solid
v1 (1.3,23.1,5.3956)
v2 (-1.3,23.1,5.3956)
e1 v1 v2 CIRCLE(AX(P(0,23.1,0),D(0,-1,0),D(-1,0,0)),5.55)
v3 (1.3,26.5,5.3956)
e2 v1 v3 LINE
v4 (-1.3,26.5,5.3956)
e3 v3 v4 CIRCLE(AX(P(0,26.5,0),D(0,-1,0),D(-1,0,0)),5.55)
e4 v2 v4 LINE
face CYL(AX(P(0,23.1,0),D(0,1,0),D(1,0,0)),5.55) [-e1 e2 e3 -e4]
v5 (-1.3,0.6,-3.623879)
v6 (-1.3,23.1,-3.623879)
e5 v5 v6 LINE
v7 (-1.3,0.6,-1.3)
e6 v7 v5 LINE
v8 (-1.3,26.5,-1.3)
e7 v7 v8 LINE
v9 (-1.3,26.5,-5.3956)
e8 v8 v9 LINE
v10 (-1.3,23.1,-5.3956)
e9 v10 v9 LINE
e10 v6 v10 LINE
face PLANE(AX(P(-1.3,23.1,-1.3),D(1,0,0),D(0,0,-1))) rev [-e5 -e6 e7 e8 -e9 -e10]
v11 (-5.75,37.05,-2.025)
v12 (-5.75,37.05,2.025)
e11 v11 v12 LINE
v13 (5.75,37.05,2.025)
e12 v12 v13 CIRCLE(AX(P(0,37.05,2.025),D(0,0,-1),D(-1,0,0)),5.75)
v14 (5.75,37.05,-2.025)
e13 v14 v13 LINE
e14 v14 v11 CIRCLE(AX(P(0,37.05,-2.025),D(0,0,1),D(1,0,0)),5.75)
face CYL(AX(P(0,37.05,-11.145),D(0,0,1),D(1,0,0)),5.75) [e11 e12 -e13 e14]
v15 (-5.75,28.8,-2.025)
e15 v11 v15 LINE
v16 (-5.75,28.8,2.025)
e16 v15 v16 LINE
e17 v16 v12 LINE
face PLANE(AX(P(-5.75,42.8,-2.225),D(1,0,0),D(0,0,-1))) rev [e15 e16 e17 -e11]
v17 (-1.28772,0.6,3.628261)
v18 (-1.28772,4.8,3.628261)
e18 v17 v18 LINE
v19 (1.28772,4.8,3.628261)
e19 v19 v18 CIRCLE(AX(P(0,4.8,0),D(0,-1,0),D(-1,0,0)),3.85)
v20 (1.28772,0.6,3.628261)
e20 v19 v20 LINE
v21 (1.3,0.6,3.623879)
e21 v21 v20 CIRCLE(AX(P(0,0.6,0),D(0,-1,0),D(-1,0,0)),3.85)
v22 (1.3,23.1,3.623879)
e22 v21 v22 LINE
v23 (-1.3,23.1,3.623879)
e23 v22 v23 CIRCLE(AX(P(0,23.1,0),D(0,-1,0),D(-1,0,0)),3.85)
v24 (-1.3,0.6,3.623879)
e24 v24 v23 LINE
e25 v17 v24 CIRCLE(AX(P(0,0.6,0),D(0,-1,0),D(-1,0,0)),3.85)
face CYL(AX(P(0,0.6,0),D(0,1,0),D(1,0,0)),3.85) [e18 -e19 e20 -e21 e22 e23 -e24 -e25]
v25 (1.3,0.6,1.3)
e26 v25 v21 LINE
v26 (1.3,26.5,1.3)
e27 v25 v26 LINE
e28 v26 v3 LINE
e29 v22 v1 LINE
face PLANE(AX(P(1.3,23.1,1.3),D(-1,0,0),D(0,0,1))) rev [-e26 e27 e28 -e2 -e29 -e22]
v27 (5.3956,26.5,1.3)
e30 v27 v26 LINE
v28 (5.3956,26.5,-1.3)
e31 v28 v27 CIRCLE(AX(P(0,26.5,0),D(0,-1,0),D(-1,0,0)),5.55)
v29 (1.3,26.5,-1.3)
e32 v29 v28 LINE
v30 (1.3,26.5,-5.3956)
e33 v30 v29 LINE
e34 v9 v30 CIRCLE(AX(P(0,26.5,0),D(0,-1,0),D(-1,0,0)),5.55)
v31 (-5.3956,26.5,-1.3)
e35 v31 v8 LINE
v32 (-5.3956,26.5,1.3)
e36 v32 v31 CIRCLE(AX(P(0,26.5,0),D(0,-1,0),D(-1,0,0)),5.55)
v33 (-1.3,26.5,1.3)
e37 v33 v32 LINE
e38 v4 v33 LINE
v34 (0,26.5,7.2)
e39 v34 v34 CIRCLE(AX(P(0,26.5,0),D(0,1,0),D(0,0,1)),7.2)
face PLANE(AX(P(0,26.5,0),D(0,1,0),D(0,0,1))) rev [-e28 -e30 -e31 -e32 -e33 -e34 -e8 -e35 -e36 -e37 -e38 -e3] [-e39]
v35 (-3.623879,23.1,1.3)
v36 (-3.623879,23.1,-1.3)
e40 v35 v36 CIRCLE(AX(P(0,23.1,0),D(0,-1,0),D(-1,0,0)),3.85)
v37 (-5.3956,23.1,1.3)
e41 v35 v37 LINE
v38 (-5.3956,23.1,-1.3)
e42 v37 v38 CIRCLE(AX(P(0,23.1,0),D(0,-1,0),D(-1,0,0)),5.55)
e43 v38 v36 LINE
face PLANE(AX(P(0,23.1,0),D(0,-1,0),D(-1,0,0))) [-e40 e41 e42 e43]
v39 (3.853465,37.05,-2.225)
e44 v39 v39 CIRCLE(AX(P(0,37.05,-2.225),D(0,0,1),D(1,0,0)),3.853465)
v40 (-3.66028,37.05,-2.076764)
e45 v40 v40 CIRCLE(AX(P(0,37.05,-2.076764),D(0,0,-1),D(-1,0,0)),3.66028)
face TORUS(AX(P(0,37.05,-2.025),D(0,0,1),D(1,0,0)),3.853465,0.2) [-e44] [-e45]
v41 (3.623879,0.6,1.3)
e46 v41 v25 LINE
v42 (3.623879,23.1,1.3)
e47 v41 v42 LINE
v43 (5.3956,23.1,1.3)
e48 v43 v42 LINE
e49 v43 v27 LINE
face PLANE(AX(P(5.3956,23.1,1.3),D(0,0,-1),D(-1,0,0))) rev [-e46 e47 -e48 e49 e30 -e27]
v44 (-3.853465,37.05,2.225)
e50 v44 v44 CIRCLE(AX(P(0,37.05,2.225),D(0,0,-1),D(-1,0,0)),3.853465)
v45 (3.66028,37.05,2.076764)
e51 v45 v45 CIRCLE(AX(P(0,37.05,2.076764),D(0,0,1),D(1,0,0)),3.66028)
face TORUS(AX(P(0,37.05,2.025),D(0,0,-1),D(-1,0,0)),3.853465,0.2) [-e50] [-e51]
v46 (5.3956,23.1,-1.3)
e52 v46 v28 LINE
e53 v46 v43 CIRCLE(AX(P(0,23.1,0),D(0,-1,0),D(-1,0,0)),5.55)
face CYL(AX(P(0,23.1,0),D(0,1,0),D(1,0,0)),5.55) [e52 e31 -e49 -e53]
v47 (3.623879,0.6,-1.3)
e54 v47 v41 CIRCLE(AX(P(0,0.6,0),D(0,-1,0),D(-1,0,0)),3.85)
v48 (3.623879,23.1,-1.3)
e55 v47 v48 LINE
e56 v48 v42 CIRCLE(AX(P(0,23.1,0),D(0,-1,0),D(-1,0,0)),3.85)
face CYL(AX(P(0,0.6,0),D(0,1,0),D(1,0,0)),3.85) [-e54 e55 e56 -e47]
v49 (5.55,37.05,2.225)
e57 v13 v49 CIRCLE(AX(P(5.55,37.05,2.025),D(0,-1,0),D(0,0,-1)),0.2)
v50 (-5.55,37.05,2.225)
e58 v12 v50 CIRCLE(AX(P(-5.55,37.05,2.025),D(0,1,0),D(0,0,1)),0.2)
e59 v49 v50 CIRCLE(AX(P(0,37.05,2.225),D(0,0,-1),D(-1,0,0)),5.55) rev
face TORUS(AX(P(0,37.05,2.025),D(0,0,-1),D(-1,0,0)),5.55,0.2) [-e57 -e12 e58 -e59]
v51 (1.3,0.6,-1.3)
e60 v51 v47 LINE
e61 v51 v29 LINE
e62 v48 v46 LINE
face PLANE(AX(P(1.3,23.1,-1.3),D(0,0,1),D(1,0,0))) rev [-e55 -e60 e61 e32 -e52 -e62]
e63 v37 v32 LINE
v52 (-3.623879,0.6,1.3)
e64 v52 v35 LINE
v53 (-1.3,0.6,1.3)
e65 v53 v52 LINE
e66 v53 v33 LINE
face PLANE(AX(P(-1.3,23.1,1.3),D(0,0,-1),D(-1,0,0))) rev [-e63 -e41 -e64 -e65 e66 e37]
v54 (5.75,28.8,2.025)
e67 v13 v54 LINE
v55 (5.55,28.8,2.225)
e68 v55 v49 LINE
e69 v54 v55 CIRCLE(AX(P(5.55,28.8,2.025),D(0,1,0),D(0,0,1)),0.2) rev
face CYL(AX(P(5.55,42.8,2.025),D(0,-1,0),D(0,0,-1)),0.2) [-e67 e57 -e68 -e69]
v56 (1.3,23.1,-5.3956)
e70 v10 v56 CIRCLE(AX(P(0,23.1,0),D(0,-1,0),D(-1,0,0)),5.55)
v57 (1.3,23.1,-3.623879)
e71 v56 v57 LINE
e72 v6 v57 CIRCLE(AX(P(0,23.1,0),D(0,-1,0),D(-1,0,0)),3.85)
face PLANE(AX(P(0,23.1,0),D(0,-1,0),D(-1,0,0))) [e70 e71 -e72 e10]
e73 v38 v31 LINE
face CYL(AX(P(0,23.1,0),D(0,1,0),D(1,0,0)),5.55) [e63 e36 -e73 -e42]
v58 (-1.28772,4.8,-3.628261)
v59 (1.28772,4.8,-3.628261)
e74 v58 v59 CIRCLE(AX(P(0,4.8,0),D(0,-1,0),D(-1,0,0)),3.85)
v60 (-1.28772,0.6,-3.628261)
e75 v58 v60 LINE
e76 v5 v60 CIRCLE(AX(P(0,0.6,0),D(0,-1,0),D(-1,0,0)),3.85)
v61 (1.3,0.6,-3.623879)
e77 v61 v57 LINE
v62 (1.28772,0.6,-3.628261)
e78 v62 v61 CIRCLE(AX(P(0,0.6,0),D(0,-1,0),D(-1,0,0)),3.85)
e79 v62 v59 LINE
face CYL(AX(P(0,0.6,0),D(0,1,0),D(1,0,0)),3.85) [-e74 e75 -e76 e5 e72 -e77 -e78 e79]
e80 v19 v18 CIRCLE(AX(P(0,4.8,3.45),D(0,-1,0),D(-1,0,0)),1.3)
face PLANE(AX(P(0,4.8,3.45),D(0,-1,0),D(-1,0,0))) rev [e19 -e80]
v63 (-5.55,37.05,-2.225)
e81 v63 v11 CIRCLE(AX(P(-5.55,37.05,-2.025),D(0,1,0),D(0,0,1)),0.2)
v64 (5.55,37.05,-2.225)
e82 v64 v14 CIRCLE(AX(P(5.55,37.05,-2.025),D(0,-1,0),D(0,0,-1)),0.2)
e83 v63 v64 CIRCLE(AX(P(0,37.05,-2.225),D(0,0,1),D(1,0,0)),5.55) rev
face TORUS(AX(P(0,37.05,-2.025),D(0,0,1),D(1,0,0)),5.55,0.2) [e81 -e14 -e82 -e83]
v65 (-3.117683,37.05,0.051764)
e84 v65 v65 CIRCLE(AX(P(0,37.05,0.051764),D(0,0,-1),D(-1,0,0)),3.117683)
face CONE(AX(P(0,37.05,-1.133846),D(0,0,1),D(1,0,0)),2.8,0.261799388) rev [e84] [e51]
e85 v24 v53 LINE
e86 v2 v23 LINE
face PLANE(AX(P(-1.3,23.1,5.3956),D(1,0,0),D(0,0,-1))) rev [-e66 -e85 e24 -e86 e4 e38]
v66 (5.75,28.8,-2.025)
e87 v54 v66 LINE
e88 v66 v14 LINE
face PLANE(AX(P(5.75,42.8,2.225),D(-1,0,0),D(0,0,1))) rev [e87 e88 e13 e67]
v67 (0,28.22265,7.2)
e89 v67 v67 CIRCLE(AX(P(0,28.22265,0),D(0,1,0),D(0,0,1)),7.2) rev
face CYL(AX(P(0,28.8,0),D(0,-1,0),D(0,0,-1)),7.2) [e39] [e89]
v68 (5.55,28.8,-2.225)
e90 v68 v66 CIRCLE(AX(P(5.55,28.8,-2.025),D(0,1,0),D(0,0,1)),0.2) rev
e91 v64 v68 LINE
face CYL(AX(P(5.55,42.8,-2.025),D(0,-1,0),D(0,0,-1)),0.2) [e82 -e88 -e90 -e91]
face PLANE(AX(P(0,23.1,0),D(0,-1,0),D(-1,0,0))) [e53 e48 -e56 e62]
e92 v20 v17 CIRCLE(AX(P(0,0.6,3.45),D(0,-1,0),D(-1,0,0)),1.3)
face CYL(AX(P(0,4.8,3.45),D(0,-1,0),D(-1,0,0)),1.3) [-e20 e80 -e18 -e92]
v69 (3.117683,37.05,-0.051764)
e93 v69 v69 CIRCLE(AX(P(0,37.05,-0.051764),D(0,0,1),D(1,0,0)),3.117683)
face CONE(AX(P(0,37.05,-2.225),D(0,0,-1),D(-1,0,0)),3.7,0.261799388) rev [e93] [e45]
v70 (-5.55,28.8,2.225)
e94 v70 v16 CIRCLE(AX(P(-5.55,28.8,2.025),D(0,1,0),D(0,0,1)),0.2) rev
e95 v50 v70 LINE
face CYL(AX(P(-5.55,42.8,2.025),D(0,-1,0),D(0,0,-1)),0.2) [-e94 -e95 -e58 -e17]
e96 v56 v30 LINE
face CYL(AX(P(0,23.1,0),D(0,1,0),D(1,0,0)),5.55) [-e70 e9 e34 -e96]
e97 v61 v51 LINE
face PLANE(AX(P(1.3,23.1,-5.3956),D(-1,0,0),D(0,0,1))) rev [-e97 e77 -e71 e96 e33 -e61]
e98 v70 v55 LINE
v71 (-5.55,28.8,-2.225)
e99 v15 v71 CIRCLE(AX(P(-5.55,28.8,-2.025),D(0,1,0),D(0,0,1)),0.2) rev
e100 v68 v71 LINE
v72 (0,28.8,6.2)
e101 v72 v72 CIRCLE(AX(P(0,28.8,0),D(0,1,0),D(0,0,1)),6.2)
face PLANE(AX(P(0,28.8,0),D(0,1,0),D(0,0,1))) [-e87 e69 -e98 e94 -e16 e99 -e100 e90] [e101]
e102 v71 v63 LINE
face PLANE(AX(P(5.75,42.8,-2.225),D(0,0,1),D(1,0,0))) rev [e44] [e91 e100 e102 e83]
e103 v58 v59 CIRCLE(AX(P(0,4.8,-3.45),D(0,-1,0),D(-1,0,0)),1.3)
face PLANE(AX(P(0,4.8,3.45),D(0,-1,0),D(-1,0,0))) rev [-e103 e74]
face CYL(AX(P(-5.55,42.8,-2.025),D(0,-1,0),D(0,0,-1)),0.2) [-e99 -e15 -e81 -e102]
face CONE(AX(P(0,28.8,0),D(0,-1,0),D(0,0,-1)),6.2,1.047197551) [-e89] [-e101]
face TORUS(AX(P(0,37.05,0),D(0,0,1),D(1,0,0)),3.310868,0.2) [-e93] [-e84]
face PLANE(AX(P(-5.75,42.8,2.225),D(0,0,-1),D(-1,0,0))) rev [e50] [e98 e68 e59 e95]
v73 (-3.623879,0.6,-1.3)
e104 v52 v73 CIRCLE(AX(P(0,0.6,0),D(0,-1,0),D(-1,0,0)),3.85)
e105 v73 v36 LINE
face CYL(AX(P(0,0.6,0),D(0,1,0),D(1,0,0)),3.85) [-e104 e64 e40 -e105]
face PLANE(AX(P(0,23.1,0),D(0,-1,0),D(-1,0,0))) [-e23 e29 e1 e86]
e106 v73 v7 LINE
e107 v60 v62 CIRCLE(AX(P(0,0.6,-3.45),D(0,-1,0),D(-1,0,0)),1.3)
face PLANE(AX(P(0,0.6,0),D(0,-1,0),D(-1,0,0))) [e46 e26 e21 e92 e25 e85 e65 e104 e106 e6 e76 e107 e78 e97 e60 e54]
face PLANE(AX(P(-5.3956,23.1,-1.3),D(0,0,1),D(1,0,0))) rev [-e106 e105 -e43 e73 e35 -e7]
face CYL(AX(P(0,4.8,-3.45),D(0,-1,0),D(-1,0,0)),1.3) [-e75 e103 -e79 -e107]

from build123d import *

# Parameters (mm, degrees)
CROQUIS1_R                 = 5.5
SALIENTE_EXTRUIR1_DEPTH    = 26.5
CROQUIS2_R                 = 7.2
SALIENTE_EXTRUIR2_DEPTH    = 2.3
CROQUIS3_W                 = 11.5
CROQUIS3_H                 = 4.45
SALIENTE_EXTRUIR3_DEPTH    = 14
CORTAR_EXTRUIR1_DEPTH      = 13.37
CROQUIS6_R                 = 4
CORTAR_EXTRUIR2_DEPTH      = 26.5
CROQUIS7_R                 = 2.8
CORTAR_EXTRUIR3_DEPTH      = 26.37
CHAFL_N1_SIZE              = 0.9
CHAFL_N1_SIZE2             = 3.358845727
CHAFL_N2_SIZE              = 3.358845727
CHAFL_N2_SIZE_2            = 0.9
REDONDEO1_R                = 0.2
REDONDEO2_R                = 0.2
CROQUIS11_W                = 4
CROQUIS11_H                = 22.3
CORTAR_EXTRUIR4_DEPTH      = 48.550085436
CORTAR_EXTRUIR5_DEPTH      = 8.4
REDONDEO3_R                = 0.2
CROQUIS14_W                = 14.4
CROQUIS14_H                = 26.5
CORTAR_EXTRUIR6_DEPTH      = 28.4
SALIENTE_EXTRUIR4_DEPTH    = 3.4
SALIENTE_EXTRUIR5_DEPTH    = 22.5
SALIENTE_EXTRUIR6_DEPTH    = 4.2
CHAFL_N3_SIZE              = 1
CHAFL_N3_SIZE2             = 0.577350269
S_LIDO_MOVER_COPIAR1_ANGLE = 90


with BuildPart() as part:
    # Croquis1 → Saliente-Extruir1 (new body)
    with BuildSketch(Plane(origin=(0, 0, 0), x_dir=(1, 0, 0), z_dir=(0, 1, 0))):
        with Locations(Location((0, 0, 0), (0, 0, 270))):
            Circle(CROQUIS1_R)
    extrude(amount=SALIENTE_EXTRUIR1_DEPTH)

    # Croquis2 → Saliente-Extruir2 (add)
    with BuildSketch(Plane(origin=(0, 26.5, 0), x_dir=(1, 0, 0), z_dir=(0, 1, 0))):
        with Locations(Location((0, 0, 0), (0, 0, 270))):
            Circle(CROQUIS2_R)
    extrude(amount=SALIENTE_EXTRUIR2_DEPTH)

    # Croquis3 → Saliente-Extruir3 (add)
    with BuildSketch(Plane(origin=(0, 28.8, 0), x_dir=(1, 0, 0), z_dir=(0, 1, 0))):
        Rectangle(CROQUIS3_W, CROQUIS3_H)
    extrude(amount=SALIENTE_EXTRUIR3_DEPTH)

    # Croquis4 → Cortar-Extruir1 (cut)
    with BuildSketch(Plane.XY.offset(2.225)):
        with BuildLine():
            Line((5.75, 42.8), (0, 42.8))
            ThreePointArc((0, 42.8), (4.065863992, 41.115863992), (5.75, 37.05))
            Line((5.75, 37.05), (5.75, 42.8))
        make_face()
        with BuildLine():
            Line((0, 42.8), (-5.75, 42.8))
            Line((-5.75, 42.8), (-5.75, 37.05))
            ThreePointArc((-5.75, 37.05), (-4.065863992, 41.115863992), (0, 42.8))
        make_face()
    extrude(amount=-CORTAR_EXTRUIR1_DEPTH, mode=Mode.SUBTRACT)

    # Croquis6 → Cortar-Extruir2 (cut)
    with BuildSketch(Plane.XZ):
        with Locations(Location((0, 0, 0), (0, 0, 270))):
            Circle(CROQUIS6_R)
    extrude(amount=-CORTAR_EXTRUIR2_DEPTH, mode=Mode.SUBTRACT)

    # Croquis7 → Cortar-Extruir3 (cut)
    with BuildSketch(Plane.XY.offset(2.225)):
        with Locations((0, 37.05)):
            Circle(CROQUIS7_R)
    extrude(amount=-CORTAR_EXTRUIR3_DEPTH, mode=Mode.SUBTRACT)

    # Chaflán1
    chafl_n1_edges = [part.edges().sort_by_distance(p)[0] for p in [
        (-2.8, 37.05, 2.225),
    ]]
    chafl_n1_side = [part.faces().sort_by_distance(p)[0] for p in [
        (0, 28.981176709, 2.225),
    ]]
    chamfer(chafl_n1_edges, length=CHAFL_N1_SIZE, length2=CHAFL_N1_SIZE2, reference=chafl_n1_side[0])

    # Chaflán2
    # the kernel refuses this chamfer: 3.358845727, 0.9 mm, written as the material it takes off along each edge
    with BuildSketch(Plane(origin=(0, 37.05, -2.225), x_dir=(1, 0, 0), z_dir=(0, -1, 0))) as chafl_n2_piece_1:
        Polygon((2.8, CHAFL_N2_SIZE), (2.8 + CHAFL_N2_SIZE_2, 0), (2.8, 0), align=None)
    revolve(axis=Axis((0, 37.05, -2.225), (0, 0, 1)), mode=Mode.SUBTRACT)

    # Redondeo1
    redondeo1_edges = [part.edges().sort_by_distance(p)[0] for p in [
        (-5.75, 32.925, 2.225),
        (-5.75, 32.925, -2.225),
        (0, 42.8, 2.225),
        (0, 42.8, -2.225),
        (5.75, 32.925, -2.225),
        (5.75, 32.925, 2.225),
    ]]
    fillet(redondeo1_edges, radius=REDONDEO1_R)

    # Redondeo2
    redondeo2_edges = [part.edges().sort_by_distance(p)[0] for p in [
        (-3.7, 37.05, 2.225),
        (-3.7, 37.05, -2.225),
        (-3.103813047, 37.05, 0),
    ]]
    fillet(redondeo2_edges, radius=REDONDEO2_R)

    # Croquis11 → Cortar-Extruir4 (cut, through all)
    with BuildSketch(Plane.XY.offset(12.225)):
        with Locations((0, 15.35)):
            Rectangle(CROQUIS11_W, CROQUIS11_H)
    extrude(amount=-CORTAR_EXTRUIR4_DEPTH, mode=Mode.SUBTRACT)

    # Croquis13 → Cortar-Extruir5 (cut)
    with BuildSketch(Plane.XZ):
        with BuildLine():
            Line((-2, -4.19791615), (4.520060123, 1.091584394))
            ThreePointArc((4.520060123, 1.091584394), (3.611110666, 2.929569892), (2, 4.19791615))
            Line((2, 4.19791615), (-4.520060123, -1.091584394))
            ThreePointArc((-4.520060123, -1.091584394), (-3.611110666, -2.929569892), (-2, -4.19791615))
        make_face()
    extrude(amount=-CORTAR_EXTRUIR5_DEPTH, mode=Mode.SUBTRACT)

    # Redondeo3
    redondeo3_edges = [part.edges().sort_by_distance(p)[0] for p in [
        (-2, 4.2, -4.660695766),
        (-2, 4.2, 4.293788499),
        (-2, 26.5, -4.293788499),
        (-2, 26.5, 4.293788499),
        (2, 26.5, 4.293788499),
        (2, 26.5, -4.293788499),
        (2, 4.2, -4.293788499),
        (2, 4.2, 4.660695766),
    ]]
    fillet(redondeo3_edges, radius=REDONDEO3_R)

    # Croquis14 → Cortar-Extruir6 (cut)
    with BuildSketch(Plane(origin=(15.75, 0, 0), x_dir=(0, 0, -1), z_dir=(1, 0, 0))):
        with Locations((0, 13.25)):
            Rectangle(CROQUIS14_W, CROQUIS14_H)
    extrude(amount=-CORTAR_EXTRUIR6_DEPTH, mode=Mode.SUBTRACT)

    # Chaflán3
    chafl_n3_edges = [part.edges().sort_by_distance(p)[0] for p in [
        (0, 28.8, -7.2),
    ]]
    chafl_n3_side = [part.faces().sort_by_distance(p)[0] for p in [
        (-5.953646753, 28.8, 0),
    ]]
    chamfer(chafl_n3_edges, length=CHAFL_N3_SIZE, length2=CHAFL_N3_SIZE2, reference=chafl_n3_side[0])


with BuildPart() as body_2:
    # Croquis15 → Saliente-Extruir4 (new body)
    with BuildSketch(Plane.XZ.offset(-26.5)):
        with BuildLine():
            Line((-1.3, 5.395600059), (-1.3, 1.3))
            Line((-1.3, 1.3), (-5.395600059, 1.3))
            ThreePointArc((-5.395600059, 1.3), (-5.55, 0), (-5.395600059, -1.3))
            Line((-5.395600059, -1.3), (-1.3, -1.3))
            Line((-1.3, -1.3), (-1.3, -5.395600059))
            ThreePointArc((-1.3, -5.395600059), (0, -5.55), (1.3, -5.395600059))
            Line((1.3, -5.395600059), (1.3, -1.3))
            Line((1.3, -1.3), (5.395600059, -1.3))
            ThreePointArc((5.395600059, -1.3), (5.55, 0), (5.395600059, 1.3))
            Line((5.395600059, 1.3), (1.3, 1.3))
            Line((1.3, 1.3), (1.3, 5.395600059))
            ThreePointArc((1.3, 5.395600059), (0, 5.55), (-1.3, 5.395600059))
        make_face()
    extrude(amount=SALIENTE_EXTRUIR4_DEPTH)


with BuildPart() as body_3:
    # Croquis16 → Saliente-Extruir5 (new body)
    with BuildSketch(Plane.XZ.offset(-23.1)):
        with BuildLine():
            Line((-3.623879137, 1.3), (-1.3, 1.3))
            Line((-1.3, 1.3), (-1.3, 3.623879137))
            ThreePointArc((-1.3, 3.623879137), (0, 3.85), (1.3, 3.623879137))
            Line((1.3, 3.623879137), (1.3, 1.3))
            Line((1.3, 1.3), (3.623879137, 1.3))
            ThreePointArc((3.623879137, 1.3), (3.85, 0), (3.623879137, -1.3))
            Line((3.623879137, -1.3), (1.3, -1.3))
            Line((1.3, -1.3), (1.3, -3.623879137))
            ThreePointArc((1.3, -3.623879137), (0, -3.85), (-1.3, -3.623879137))
            Line((-1.3, -3.623879137), (-1.3, -1.3))
            Line((-1.3, -1.3), (-3.623879137, -1.3))
            ThreePointArc((-3.623879137, -1.3), (-3.85, 0), (-3.623879137, 1.3))
        make_face()
    extrude(amount=SALIENTE_EXTRUIR5_DEPTH)


with BuildPart() as body_4:
    # Croquis17 → Saliente-Extruir6 (new body)
    with BuildSketch(Plane.XZ.offset(-0.6)):
        with BuildLine():
            Line((-3.45, 1.3), (3.45, 1.3))
            ThreePointArc((3.45, 1.3), (4.75, 0), (3.45, -1.3))
            Line((3.45, -1.3), (-3.45, -1.3))
            ThreePointArc((-3.45, -1.3), (-4.75, 0), (-3.45, 1.3))
        make_face()
    extrude(amount=-SALIENTE_EXTRUIR6_DEPTH)


with BuildPart() as body_3_1:
    add(body_3.part)

    # Combinar1: union body 4
    add(body_4.part)


with BuildPart() as body_2_1:
    add(body_2.part)

    # Combinar2: union body 3
    add(body_3_1.part)


with BuildPart() as body_2_2:
    # Sólido-Mover/Copiar1: moved
    add(body_2_1.part.rotate(Axis((0, 0, 0), (0, 1, 0)), S_LIDO_MOVER_COPIAR1_ANGLE))

    # Combinar3: union part
    add(part.part)


solid = body_2_2.part
